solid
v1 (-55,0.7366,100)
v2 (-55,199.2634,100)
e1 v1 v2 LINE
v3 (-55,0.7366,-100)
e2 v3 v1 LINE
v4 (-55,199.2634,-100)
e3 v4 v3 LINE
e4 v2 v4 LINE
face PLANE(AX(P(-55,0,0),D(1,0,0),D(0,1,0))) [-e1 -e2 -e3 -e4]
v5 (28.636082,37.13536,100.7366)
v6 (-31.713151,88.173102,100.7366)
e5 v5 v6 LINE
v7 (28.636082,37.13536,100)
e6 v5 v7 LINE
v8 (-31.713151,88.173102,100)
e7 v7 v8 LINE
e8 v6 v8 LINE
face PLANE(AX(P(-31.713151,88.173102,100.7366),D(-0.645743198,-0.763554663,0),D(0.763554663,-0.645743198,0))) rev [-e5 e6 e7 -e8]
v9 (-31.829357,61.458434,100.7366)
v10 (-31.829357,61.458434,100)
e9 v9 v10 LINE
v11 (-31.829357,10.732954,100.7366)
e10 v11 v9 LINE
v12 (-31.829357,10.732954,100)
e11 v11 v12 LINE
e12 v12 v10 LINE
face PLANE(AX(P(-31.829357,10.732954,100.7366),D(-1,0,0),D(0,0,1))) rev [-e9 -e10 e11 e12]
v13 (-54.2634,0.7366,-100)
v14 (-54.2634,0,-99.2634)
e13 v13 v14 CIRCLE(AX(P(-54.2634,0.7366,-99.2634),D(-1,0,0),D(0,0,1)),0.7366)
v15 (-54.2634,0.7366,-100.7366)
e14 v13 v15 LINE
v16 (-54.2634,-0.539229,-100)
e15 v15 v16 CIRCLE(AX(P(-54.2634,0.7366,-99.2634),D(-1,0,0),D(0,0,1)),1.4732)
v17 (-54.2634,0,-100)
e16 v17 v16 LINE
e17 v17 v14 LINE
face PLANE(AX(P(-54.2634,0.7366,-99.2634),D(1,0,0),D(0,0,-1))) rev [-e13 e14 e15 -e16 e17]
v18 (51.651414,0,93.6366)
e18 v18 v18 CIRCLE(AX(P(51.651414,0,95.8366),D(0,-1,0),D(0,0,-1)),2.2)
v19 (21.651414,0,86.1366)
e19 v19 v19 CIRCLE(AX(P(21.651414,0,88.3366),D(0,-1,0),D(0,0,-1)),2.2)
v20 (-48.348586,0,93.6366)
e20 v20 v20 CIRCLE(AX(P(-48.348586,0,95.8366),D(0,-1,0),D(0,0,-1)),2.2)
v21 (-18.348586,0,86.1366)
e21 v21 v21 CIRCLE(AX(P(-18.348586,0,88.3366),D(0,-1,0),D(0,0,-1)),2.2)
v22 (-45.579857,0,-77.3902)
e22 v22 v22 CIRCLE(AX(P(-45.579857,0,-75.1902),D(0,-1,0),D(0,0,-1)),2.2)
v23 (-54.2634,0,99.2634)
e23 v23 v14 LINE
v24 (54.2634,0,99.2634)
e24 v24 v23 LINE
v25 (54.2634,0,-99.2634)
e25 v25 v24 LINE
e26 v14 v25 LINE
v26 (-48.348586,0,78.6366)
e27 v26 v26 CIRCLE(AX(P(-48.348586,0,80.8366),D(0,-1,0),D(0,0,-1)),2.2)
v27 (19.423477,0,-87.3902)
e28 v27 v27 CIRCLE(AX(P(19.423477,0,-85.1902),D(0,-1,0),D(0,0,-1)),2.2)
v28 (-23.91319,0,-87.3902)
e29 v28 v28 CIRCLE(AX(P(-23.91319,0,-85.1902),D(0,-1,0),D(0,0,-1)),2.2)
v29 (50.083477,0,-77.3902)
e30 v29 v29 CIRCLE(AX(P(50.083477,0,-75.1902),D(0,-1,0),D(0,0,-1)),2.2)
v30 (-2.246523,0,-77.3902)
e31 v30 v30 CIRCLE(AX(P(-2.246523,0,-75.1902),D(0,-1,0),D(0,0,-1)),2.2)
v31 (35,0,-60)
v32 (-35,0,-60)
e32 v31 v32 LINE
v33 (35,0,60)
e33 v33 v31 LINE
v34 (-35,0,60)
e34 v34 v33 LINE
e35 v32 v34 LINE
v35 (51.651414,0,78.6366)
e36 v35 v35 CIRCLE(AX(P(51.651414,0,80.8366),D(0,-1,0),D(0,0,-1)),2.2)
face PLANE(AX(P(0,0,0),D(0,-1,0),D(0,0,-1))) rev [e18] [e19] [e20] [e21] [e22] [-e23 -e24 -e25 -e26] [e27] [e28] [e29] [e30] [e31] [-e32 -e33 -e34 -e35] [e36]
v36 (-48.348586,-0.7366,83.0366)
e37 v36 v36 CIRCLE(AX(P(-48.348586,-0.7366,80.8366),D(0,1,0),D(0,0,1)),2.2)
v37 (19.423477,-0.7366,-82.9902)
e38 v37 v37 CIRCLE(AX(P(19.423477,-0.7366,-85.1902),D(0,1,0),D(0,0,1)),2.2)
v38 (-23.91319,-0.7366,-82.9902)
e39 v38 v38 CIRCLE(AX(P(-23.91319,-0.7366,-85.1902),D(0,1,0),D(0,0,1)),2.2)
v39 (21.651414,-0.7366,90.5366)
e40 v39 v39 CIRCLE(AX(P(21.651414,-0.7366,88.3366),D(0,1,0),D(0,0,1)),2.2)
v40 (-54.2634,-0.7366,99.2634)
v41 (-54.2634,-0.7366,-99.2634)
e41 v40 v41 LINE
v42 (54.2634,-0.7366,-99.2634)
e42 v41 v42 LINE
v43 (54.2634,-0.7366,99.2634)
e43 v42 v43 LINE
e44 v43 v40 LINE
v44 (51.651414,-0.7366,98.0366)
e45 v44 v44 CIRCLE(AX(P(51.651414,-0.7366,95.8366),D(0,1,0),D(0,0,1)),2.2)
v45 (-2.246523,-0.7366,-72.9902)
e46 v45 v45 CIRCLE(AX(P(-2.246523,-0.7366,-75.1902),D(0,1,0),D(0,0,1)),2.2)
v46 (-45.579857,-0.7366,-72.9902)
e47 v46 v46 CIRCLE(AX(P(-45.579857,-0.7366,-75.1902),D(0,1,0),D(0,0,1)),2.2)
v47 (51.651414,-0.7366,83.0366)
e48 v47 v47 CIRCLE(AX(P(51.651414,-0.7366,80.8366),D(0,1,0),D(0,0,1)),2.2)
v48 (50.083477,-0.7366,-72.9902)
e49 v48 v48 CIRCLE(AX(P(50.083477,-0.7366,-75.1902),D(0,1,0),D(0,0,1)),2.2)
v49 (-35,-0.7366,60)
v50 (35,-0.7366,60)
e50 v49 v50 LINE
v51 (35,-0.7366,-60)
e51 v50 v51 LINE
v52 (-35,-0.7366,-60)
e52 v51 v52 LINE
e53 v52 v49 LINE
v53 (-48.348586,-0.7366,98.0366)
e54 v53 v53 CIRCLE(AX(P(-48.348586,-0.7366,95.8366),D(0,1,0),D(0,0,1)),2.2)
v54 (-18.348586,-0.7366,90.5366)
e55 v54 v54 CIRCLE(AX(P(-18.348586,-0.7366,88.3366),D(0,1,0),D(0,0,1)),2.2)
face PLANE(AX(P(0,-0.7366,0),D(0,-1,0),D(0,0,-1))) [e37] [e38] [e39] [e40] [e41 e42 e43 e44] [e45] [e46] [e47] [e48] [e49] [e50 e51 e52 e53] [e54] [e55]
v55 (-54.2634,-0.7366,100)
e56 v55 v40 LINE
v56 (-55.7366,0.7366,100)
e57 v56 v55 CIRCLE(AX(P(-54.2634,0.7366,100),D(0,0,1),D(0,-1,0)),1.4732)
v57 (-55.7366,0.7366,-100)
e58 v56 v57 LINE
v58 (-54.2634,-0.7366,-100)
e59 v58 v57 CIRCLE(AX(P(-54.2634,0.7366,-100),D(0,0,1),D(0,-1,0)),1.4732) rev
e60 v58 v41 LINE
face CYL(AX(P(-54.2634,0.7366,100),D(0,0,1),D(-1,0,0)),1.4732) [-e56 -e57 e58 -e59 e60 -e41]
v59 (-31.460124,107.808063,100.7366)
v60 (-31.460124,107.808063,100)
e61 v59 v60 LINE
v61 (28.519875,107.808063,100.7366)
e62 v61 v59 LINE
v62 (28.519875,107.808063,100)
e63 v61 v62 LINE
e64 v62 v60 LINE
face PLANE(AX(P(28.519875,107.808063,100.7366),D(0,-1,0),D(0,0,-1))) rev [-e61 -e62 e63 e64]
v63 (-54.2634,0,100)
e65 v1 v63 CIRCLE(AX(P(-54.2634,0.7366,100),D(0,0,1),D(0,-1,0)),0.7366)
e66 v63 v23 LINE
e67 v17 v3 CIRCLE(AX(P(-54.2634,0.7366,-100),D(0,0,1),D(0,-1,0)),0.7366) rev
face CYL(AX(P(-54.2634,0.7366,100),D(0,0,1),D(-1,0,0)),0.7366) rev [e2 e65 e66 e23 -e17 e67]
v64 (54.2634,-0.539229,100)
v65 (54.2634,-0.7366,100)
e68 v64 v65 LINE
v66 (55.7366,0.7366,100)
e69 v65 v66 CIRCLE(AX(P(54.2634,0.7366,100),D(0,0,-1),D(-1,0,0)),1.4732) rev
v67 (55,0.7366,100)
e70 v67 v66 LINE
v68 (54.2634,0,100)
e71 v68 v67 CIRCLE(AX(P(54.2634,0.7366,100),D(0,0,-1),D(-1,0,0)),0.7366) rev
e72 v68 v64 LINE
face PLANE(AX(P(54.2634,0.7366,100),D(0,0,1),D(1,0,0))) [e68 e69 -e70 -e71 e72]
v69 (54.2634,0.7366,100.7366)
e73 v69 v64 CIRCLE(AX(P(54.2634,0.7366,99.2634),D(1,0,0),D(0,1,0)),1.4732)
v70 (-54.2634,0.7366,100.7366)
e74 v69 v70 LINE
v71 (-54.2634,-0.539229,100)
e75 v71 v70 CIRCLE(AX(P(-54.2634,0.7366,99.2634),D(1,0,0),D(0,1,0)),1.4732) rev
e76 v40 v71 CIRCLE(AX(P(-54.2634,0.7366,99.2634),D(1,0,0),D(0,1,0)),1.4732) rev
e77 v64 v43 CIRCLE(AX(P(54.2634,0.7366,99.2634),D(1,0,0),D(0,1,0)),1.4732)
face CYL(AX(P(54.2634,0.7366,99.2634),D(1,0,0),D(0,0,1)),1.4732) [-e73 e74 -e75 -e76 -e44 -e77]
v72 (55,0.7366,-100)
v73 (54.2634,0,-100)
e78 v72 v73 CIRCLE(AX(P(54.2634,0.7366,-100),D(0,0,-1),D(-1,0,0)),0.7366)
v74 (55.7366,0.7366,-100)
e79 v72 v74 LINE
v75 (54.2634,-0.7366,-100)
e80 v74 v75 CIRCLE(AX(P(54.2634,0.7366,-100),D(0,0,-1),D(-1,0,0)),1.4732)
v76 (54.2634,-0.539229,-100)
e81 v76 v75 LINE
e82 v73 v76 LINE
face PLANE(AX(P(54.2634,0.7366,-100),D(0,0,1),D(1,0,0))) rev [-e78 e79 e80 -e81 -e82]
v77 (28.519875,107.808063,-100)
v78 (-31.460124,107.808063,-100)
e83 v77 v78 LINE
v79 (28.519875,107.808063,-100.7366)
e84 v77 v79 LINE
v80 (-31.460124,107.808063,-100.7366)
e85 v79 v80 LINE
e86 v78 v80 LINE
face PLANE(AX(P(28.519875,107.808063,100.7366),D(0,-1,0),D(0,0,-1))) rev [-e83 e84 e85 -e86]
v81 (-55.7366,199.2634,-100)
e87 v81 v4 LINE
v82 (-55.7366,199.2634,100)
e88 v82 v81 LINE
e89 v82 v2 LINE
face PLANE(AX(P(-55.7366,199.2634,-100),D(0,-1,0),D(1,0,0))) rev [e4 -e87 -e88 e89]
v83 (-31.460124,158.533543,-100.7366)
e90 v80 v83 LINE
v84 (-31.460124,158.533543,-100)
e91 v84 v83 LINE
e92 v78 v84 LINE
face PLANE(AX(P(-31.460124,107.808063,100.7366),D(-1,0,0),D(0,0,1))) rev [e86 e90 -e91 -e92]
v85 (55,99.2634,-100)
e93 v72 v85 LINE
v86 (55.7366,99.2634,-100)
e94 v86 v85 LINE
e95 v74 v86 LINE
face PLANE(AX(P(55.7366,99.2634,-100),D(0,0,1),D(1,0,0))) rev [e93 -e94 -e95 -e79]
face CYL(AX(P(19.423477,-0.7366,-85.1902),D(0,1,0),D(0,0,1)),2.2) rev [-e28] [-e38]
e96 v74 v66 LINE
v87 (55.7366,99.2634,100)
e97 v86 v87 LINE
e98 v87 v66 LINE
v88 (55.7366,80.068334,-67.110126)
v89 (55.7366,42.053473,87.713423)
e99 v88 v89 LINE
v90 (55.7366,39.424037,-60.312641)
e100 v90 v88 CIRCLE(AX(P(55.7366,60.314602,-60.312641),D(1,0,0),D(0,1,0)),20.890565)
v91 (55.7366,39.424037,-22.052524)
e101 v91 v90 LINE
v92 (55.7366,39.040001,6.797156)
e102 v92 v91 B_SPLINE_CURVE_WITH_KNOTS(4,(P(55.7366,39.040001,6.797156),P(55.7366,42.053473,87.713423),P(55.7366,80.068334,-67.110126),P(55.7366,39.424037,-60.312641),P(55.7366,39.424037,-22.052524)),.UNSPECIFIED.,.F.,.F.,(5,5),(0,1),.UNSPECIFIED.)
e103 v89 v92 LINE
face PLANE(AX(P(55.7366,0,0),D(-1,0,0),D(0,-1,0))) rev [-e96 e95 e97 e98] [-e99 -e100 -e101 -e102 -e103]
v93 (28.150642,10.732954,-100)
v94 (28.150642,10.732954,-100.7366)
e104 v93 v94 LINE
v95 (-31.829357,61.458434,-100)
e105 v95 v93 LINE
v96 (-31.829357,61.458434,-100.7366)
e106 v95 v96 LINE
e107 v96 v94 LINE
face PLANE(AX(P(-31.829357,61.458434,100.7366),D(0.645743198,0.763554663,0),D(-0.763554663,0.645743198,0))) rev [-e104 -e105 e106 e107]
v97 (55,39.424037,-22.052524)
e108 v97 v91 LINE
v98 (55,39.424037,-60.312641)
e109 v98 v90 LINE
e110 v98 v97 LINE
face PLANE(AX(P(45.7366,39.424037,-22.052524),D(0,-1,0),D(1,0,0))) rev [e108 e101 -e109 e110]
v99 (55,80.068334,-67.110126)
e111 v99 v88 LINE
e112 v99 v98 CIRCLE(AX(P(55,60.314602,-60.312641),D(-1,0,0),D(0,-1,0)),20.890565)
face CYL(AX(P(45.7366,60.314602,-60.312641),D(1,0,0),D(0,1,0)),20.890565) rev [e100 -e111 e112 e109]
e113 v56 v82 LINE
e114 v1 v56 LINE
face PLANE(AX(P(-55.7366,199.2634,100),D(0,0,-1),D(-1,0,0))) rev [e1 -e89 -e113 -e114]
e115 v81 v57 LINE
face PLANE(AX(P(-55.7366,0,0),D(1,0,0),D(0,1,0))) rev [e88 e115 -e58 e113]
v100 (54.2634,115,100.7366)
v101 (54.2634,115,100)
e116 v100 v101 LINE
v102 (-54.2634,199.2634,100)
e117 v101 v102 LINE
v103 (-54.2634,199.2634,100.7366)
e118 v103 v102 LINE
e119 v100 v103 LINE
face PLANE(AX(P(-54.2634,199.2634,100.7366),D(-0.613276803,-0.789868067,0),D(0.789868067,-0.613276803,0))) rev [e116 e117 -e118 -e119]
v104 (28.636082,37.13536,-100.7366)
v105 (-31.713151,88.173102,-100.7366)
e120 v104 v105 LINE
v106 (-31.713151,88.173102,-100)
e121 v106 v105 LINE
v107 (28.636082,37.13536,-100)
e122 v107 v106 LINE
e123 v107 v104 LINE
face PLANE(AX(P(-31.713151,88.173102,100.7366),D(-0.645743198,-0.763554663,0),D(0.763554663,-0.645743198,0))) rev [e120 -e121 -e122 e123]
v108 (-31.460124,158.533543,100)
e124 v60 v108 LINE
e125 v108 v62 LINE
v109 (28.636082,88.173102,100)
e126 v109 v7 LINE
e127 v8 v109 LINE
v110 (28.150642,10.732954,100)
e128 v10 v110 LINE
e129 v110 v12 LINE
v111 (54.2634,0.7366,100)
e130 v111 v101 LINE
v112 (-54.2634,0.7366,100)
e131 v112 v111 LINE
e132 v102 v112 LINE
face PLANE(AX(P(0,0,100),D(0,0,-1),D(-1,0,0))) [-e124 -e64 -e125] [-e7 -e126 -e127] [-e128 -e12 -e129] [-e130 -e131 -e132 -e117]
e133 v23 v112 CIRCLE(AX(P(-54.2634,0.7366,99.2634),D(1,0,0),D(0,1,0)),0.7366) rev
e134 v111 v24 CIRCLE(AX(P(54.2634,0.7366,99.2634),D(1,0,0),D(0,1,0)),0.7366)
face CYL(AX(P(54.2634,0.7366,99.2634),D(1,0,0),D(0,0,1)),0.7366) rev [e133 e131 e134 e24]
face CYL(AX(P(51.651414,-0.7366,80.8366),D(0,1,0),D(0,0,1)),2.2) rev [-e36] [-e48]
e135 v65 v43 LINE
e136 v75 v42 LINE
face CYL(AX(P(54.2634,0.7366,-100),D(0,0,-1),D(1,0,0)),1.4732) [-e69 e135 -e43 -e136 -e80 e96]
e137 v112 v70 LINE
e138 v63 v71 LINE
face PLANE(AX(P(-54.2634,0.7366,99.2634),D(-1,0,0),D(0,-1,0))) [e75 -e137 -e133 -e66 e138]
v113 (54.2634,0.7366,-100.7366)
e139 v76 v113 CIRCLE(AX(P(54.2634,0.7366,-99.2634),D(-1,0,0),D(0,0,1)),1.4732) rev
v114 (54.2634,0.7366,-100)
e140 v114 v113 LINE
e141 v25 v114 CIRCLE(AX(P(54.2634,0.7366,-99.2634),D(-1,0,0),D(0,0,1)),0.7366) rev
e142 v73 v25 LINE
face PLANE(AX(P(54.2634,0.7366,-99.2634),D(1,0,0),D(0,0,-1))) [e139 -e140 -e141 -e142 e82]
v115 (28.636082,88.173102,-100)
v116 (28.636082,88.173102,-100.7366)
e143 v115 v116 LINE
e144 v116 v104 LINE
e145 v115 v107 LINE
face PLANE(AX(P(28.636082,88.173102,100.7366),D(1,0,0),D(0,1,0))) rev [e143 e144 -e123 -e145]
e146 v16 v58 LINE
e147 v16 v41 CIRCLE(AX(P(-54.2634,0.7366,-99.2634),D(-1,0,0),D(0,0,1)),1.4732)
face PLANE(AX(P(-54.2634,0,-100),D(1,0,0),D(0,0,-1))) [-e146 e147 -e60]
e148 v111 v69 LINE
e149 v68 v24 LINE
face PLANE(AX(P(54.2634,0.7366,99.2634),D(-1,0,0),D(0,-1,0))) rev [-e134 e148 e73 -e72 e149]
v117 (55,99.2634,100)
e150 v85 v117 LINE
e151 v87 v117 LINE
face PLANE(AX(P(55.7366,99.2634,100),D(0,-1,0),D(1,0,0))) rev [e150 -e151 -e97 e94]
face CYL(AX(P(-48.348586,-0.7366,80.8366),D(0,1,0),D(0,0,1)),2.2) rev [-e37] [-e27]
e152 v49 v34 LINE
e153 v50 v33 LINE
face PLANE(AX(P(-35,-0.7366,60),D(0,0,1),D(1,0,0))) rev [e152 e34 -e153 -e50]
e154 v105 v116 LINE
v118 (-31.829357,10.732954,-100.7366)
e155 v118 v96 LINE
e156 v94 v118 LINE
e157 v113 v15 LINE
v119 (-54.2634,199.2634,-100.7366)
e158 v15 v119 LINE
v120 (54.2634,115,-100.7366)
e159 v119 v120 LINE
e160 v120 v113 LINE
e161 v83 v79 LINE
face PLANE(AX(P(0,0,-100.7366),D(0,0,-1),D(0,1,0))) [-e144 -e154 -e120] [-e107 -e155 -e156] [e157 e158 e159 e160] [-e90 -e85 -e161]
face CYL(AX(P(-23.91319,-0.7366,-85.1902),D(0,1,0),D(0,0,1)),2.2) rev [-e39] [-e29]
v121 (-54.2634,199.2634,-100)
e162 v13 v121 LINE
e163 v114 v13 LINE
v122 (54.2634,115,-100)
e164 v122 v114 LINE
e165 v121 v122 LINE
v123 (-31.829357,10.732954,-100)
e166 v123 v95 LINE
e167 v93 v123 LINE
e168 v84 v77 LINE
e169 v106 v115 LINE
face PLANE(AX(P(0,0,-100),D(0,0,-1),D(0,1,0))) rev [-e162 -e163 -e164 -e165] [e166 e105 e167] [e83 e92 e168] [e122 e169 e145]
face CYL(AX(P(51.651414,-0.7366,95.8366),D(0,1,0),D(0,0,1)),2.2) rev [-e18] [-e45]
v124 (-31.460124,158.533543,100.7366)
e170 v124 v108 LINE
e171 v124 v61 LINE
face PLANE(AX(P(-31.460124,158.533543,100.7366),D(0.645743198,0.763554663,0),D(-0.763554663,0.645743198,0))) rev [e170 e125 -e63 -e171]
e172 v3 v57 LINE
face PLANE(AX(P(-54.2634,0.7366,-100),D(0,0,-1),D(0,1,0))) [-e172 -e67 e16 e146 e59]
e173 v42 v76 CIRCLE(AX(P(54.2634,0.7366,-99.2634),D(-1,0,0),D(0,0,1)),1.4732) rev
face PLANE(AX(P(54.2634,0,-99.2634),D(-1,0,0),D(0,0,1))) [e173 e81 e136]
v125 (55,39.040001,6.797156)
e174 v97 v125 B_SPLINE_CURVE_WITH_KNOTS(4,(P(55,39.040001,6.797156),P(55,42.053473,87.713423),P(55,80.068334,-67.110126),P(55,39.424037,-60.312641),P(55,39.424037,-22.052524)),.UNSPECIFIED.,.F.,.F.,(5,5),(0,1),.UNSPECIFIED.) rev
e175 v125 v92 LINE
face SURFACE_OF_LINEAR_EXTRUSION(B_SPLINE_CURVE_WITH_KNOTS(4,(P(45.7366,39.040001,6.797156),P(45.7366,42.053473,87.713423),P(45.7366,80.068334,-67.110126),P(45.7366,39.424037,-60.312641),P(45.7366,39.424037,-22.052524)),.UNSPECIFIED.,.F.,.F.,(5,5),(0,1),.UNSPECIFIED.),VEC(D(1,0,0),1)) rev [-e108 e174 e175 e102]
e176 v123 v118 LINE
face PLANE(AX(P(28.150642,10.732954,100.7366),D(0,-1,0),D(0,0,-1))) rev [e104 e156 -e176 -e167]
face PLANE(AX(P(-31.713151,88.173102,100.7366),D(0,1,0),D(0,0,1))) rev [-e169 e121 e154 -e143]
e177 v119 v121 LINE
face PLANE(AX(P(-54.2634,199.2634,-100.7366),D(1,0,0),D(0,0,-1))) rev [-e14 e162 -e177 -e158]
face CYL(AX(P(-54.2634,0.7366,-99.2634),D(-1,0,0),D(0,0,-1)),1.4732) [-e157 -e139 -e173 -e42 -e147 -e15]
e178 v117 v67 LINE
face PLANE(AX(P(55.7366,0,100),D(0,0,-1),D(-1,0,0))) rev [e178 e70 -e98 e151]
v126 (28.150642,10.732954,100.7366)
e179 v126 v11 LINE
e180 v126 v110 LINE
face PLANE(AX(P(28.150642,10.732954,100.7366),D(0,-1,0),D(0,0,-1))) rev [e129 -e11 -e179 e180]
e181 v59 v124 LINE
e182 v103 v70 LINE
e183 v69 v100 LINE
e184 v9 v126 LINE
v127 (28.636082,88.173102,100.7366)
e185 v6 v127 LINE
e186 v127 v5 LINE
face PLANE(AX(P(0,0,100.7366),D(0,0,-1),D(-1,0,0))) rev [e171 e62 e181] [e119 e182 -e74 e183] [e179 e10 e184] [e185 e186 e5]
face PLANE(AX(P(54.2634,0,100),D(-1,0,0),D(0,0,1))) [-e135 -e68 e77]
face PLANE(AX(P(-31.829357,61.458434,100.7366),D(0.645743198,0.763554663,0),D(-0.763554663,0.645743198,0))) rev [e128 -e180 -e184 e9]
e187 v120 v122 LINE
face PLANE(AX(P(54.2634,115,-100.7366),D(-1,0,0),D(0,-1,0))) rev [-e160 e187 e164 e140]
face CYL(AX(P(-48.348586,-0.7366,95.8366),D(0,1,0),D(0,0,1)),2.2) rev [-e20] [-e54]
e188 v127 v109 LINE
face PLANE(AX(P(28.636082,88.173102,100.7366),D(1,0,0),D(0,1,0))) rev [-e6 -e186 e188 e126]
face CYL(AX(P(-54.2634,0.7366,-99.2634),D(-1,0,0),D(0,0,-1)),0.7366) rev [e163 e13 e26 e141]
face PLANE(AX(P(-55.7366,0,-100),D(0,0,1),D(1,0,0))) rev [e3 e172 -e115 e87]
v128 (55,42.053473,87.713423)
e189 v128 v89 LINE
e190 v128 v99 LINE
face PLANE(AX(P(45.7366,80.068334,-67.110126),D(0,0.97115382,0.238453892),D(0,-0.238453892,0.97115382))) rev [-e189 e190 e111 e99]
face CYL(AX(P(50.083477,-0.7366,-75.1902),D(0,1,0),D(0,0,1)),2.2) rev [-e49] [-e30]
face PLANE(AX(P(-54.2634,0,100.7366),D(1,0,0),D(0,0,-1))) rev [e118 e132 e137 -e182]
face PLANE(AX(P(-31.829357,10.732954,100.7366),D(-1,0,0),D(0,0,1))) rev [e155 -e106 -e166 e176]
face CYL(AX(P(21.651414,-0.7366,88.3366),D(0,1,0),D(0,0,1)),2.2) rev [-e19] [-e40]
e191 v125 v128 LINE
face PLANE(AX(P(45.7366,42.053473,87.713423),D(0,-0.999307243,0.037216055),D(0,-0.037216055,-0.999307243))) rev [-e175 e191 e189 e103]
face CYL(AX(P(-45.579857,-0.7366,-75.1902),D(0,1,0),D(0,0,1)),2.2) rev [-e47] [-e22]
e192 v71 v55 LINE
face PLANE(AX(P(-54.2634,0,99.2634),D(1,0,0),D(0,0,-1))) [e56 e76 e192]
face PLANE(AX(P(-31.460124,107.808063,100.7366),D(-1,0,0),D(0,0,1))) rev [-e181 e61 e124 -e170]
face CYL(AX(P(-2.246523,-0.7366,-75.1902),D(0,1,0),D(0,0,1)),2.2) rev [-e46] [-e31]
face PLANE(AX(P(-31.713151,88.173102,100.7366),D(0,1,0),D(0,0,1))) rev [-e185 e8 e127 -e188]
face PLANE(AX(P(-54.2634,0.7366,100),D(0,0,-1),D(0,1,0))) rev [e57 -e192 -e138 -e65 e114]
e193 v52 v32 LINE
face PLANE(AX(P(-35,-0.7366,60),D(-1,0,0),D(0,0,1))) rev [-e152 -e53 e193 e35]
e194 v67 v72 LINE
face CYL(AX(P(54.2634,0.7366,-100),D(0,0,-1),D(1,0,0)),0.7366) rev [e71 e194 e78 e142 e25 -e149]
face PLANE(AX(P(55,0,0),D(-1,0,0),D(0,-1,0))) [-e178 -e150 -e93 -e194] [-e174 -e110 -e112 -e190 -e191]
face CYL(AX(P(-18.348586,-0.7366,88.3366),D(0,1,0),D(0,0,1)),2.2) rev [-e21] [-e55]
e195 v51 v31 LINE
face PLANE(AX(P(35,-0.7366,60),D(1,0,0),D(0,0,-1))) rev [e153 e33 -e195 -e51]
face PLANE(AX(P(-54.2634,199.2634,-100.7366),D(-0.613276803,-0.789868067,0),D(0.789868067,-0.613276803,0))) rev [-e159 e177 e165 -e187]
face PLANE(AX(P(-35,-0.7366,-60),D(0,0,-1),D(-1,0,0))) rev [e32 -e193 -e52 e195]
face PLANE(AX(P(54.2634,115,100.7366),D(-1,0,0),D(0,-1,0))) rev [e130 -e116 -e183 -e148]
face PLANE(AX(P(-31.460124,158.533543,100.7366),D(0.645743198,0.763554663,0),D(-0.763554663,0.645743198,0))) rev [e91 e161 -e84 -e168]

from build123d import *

# Parameters (mm, degrees)
SKETCH1_W                    = 110
SKETCH1_H                    = 200
SKETCH1_W_2                  = 70
SKETCH1_H_2                  = 120
BASE_FLANGE1_DEPTH           = 0.7366
EDGE_FLANGE1_STRIP_W         = 4.4196
EDGE_FLANGE1_STRIP_H         = 0.7366
EDGE_FLANGE1_STRIP_CUT_DEPTH = 200
EDGE_FLANGE1_DEPTH           = 200
EDGE_FLANGE2_STRIP_W         = 4.4196
EDGE_FLANGE2_STRIP_H         = 0.7366
EDGE_FLANGE2_STRIP_CUT_DEPTH = 200
EDGE_FLANGE2_DEPTH           = 200
EDGE_FLANGE3_STRIP_W         = 4.4196
EDGE_FLANGE3_STRIP_H         = 0.7366
EDGE_FLANGE3_STRIP_CUT_DEPTH = 108.5268
EDGE_FLANGE3_DEPTH           = 108.5268
EDGE_FLANGE3_START           = 0.7366
EDGE_FLANGE3_FLAT_DEPTH      = 0.7366
EDGE_FLANGE4_STRIP_W         = 4.4196
EDGE_FLANGE4_STRIP_H         = 0.7366
EDGE_FLANGE4_STRIP_CUT_DEPTH = 108.5268
EDGE_FLANGE4_DEPTH           = 108.5268
EDGE_FLANGE4_START           = 0.7366
EDGE_FLANGE4_FLAT_DEPTH      = 0.7366
CUT_EXTRUDE2_DEPTH           = 289.797370967
CUT_EXTRUDE3_START           = -0.7366
CUT_EXTRUDE3_DEPTH           = 0.7366
CUT_EXTRUDE6_DEPTH           = 800.082459726
CUT_EXTRUDE6_DEPTH_BACK      = 800.082459726
SKETCH53_R                   = 2.2
SKETCH53_R_2                 = 2.199999998


# Read off the part's stored shape, not the designer's step: Cut-Extrude3
# Sheet-metal steps are written as plain solids
with BuildPart() as part:
    # Sketch1 → Base-Flange1 (new body)
    with BuildSketch(Plane(origin=(0, 0, 0), x_dir=(1, 0, 0), z_dir=(0, 1, 0))):
        Rectangle(SKETCH1_W, SKETCH1_H)
        Rectangle(SKETCH1_W_2, SKETCH1_H_2, mode=Mode.SUBTRACT)
    extrude(amount=-BASE_FLANGE1_DEPTH)

    # Edge-Flange1 strip (across the edge) → Edge-Flange1 strip cut (cut)
    with BuildSketch(Plane(origin=(-55, 0, -100), x_dir=(1, 0, 0), z_dir=(0, 0, 1))):
        with Locations((-1.4732, -0.3683)):
            Rectangle(EDGE_FLANGE1_STRIP_W, EDGE_FLANGE1_STRIP_H)
    extrude(amount=EDGE_FLANGE1_STRIP_CUT_DEPTH, mode=Mode.SUBTRACT)

    # Edge-Flange1 section (across the edge) → Edge-Flange1 (add)
    with BuildSketch(Plane(origin=(-55, 0, -100), x_dir=(1, 0, 0), z_dir=(0, 0, 1))):
        with BuildLine():
            Line((-0.7366, 0.7366), (-0.7366, 199.2634))
            Line((-0.7366, 199.2634), (0, 199.2634))
            Line((0, 199.2634), (0, 0.7366))
            ThreePointArc((0, 0.7366), (0.215745145, 0.215745145), (0.7366, 0))
            Line((0.7366, 0), (0.7366, -0.7366))
            ThreePointArc((0.7366, -0.7366), (-0.30510971, -0.30510971), (-0.7366, 0.7366))
        make_face()
    extrude(amount=EDGE_FLANGE1_DEPTH)

    # Edge-Flange2 strip (across the edge) → Edge-Flange2 strip cut (cut)
    with BuildSketch(Plane(origin=(55, 0, 100), x_dir=(-1, 0, 0), z_dir=(0, 0, -1))):
        with Locations((-1.4732, -0.3683)):
            Rectangle(EDGE_FLANGE2_STRIP_W, EDGE_FLANGE2_STRIP_H)
    extrude(amount=EDGE_FLANGE2_STRIP_CUT_DEPTH, mode=Mode.SUBTRACT)

    # Edge-Flange2 section (across the edge) → Edge-Flange2 (add)
    with BuildSketch(Plane(origin=(55, 0, 100), x_dir=(-1, 0, 0), z_dir=(0, 0, -1))):
        with BuildLine():
            Line((-0.7366, 0.7366), (-0.7366, 99.2634))
            Line((-0.7366, 99.2634), (0, 99.2634))
            Line((0, 99.2634), (0, 0.7366))
            ThreePointArc((0, 0.7366), (0.215745145, 0.215745145), (0.7366, 0))
            Line((0.7366, 0), (0.7366, -0.7366))
            ThreePointArc((0.7366, -0.7366), (-0.30510971, -0.30510971), (-0.7366, 0.7366))
        make_face()
    extrude(amount=EDGE_FLANGE2_DEPTH)

    # Edge-Flange3 strip (across the edge) → Edge-Flange3 strip cut (cut)
    with BuildSketch(Plane(origin=(54.2634, 0, -100), x_dir=(0, 0, 1), z_dir=(-1, 0, 0))):
        with Locations((-1.4732, -0.3683)):
            Rectangle(EDGE_FLANGE3_STRIP_W, EDGE_FLANGE3_STRIP_H)
    extrude(amount=EDGE_FLANGE3_STRIP_CUT_DEPTH, mode=Mode.SUBTRACT)

    # Edge-Flange3 bend section (across the edge) → Edge-Flange3 (add)
    with BuildSketch(Plane(origin=(54.2634, 0, -100), x_dir=(0, 0, 1), z_dir=(-1, 0, 0))):
        with BuildLine():
            Line((-0.7366, 0.7366), (0, 0.7366))
            ThreePointArc((0, 0.7366), (0.215745145, 0.215745145), (0.7366, 0))
            Line((0.7366, 0), (0.7366, -0.7366))
            ThreePointArc((0.7366, -0.7366), (-0.30510971, -0.30510971), (-0.7366, 0.7366))
        make_face()
    extrude(amount=EDGE_FLANGE3_DEPTH)

    # Edge-Flange3 profile (on flange) → Edge-Flange3 flat (add)
    with BuildSketch(Plane(origin=(0, 0, -100), x_dir=(-1, 0, 0), z_dir=(0, 0, -1)).offset(EDGE_FLANGE3_START)):
        Polygon((-54.2634, 115), (-54.2634, 0.7366), (54.2634, 0.7366), (54.2634, 199.2634), align=None)
    extrude(amount=-EDGE_FLANGE3_FLAT_DEPTH)

    # Edge-Flange4 strip (across the edge) → Edge-Flange4 strip cut (cut)
    with BuildSketch(Plane(origin=(-54.2634, 0, 100), x_dir=(0, 0, -1), z_dir=(1, 0, 0))):
        with Locations((-1.4732, -0.3683)):
            Rectangle(EDGE_FLANGE4_STRIP_W, EDGE_FLANGE4_STRIP_H)
    extrude(amount=EDGE_FLANGE4_STRIP_CUT_DEPTH, mode=Mode.SUBTRACT)

    # Edge-Flange4 bend section (across the edge) → Edge-Flange4 (add)
    with BuildSketch(Plane(origin=(-54.2634, 0, 100), x_dir=(0, 0, -1), z_dir=(1, 0, 0))):
        with BuildLine():
            Line((-0.7366, 0.7366), (0, 0.7366))
            ThreePointArc((0, 0.7366), (0.215745145, 0.215745145), (0.7366, 0))
            Line((0.7366, 0), (0.7366, -0.7366))
            ThreePointArc((0.7366, -0.7366), (-0.30510971, -0.30510971), (-0.7366, 0.7366))
        make_face()
    extrude(amount=EDGE_FLANGE4_DEPTH)

    # Edge-Flange4 profile (on flange) → Edge-Flange4 flat (add)
    with BuildSketch(Plane.XY.offset(100).offset(EDGE_FLANGE4_START)):
        Polygon((-54.2634, 199.2634), (-54.2634, 0.7366), (54.2634, 0.7366), (54.2634, 115), align=None)
    extrude(amount=-EDGE_FLANGE4_FLAT_DEPTH)

    # Sketch24 → Cut-Extrude2 (cut, through all)
    with BuildSketch(Plane(origin=(0, 0, -100.7366), x_dir=(-1, 0, 0), z_dir=(0, 0, -1))):
        Polygon((-28.519875042, 107.808063094), (31.460124178, 107.808063094), (31.460124178, 158.533542729), align=None)
        Polygon((-28.150641863, 10.732953924), (31.829357358, 10.732953924), (31.829357358, 61.45843356), align=None)
        Polygon((31.713150602, 88.173102361), (-28.636081798, 88.173102361), (-28.636081798, 37.135359798), align=None)
    extrude(amount=-CUT_EXTRUDE2_DEPTH, mode=Mode.SUBTRACT)

    # Cut-Extrude3 outline → Cut-Extrude3 (cut)
    with BuildSketch(Plane(origin=(55.7366, 0, 0), x_dir=(0, 0, -1), z_dir=(1, 0, 0)).offset(CUT_EXTRUDE3_START)):
        with BuildLine():
            Line((-87.713422796, 42.053472661), (-6.797155753, 39.040000774))
            add(Edge.make_bspline(
                [(-6.797155753, 39.040000774), (-87.713422796, 42.053472661), (67.110125935, 80.068334048), (60.312641059, 39.424036929), (22.052524279, 39.424036929)],
                knots=[0, 0, 0, 0, 0, 1, 1, 1, 1, 1], degree=4))
            Line((22.052524279, 39.424036929), (60.312641059, 39.424036929))
            ThreePointArc((60.312641059, 39.424036929), (80.917037974, 56.86865569), (67.110125935, 80.068334048))
            Line((67.110125935, 80.068334048), (-87.713422796, 42.053472661))
        make_face()
    extrude(amount=CUT_EXTRUDE3_DEPTH, mode=Mode.SUBTRACT)

    # Sketch53 → Cut-Extrude6 (cut, two sides: drawn at the far end of the back side and taken through both)
    with BuildSketch(Plane(origin=(344.115063699, 0, 561.793038506), x_dir=(-1, 0, 0), z_dir=(0, 1, 0)).offset(-CUT_EXTRUDE6_DEPTH_BACK)):
        with Locations(Location((392.463649434, -480.956438506, 0), (0, 0, 90))):
            Circle(SKETCH53_R)
        with Locations(Location((392.463649434, -465.956438506, 0), (0, 0, 90))):
            Circle(SKETCH53_R)
        with Locations(Location((362.463649434, -473.456438506, 0), (0, 0, 90))):
            Circle(SKETCH53_R)
        with Locations(Location((292.463649434, -480.956438506, 0), (0, 0, 90))):
            Circle(SKETCH53_R)
        with Locations(Location((292.463649434, -465.956438506, 0), (0, 0, 90))):
            Circle(SKETCH53_R)
        with Locations(Location((322.463649434, -473.456438506, 0), (0, 0, 90))):
            Circle(SKETCH53_R)
        with Locations(Location((294.03158687, -636.983238506, 0), (0, 0, 90))):
            Circle(SKETCH53_R_2)
        with Locations(Location((324.69158687, -646.983238506, 0), (0, 0, 90))):
            Circle(SKETCH53_R_2)
        with Locations(Location((346.36158687, -636.983238506, 0), (0, 0, 90))):
            Circle(SKETCH53_R_2)
        with Locations(Location((368.028253537, -646.983238506, 0), (0, 0, 90))):
            Circle(SKETCH53_R_2)
        with Locations(Location((389.694920203, -636.983238506, 0), (0, 0, 90))):
            Circle(SKETCH53_R_2)
    extrude(amount=CUT_EXTRUDE6_DEPTH + CUT_EXTRUDE6_DEPTH_BACK, mode=Mode.SUBTRACT)


solid = part.part
